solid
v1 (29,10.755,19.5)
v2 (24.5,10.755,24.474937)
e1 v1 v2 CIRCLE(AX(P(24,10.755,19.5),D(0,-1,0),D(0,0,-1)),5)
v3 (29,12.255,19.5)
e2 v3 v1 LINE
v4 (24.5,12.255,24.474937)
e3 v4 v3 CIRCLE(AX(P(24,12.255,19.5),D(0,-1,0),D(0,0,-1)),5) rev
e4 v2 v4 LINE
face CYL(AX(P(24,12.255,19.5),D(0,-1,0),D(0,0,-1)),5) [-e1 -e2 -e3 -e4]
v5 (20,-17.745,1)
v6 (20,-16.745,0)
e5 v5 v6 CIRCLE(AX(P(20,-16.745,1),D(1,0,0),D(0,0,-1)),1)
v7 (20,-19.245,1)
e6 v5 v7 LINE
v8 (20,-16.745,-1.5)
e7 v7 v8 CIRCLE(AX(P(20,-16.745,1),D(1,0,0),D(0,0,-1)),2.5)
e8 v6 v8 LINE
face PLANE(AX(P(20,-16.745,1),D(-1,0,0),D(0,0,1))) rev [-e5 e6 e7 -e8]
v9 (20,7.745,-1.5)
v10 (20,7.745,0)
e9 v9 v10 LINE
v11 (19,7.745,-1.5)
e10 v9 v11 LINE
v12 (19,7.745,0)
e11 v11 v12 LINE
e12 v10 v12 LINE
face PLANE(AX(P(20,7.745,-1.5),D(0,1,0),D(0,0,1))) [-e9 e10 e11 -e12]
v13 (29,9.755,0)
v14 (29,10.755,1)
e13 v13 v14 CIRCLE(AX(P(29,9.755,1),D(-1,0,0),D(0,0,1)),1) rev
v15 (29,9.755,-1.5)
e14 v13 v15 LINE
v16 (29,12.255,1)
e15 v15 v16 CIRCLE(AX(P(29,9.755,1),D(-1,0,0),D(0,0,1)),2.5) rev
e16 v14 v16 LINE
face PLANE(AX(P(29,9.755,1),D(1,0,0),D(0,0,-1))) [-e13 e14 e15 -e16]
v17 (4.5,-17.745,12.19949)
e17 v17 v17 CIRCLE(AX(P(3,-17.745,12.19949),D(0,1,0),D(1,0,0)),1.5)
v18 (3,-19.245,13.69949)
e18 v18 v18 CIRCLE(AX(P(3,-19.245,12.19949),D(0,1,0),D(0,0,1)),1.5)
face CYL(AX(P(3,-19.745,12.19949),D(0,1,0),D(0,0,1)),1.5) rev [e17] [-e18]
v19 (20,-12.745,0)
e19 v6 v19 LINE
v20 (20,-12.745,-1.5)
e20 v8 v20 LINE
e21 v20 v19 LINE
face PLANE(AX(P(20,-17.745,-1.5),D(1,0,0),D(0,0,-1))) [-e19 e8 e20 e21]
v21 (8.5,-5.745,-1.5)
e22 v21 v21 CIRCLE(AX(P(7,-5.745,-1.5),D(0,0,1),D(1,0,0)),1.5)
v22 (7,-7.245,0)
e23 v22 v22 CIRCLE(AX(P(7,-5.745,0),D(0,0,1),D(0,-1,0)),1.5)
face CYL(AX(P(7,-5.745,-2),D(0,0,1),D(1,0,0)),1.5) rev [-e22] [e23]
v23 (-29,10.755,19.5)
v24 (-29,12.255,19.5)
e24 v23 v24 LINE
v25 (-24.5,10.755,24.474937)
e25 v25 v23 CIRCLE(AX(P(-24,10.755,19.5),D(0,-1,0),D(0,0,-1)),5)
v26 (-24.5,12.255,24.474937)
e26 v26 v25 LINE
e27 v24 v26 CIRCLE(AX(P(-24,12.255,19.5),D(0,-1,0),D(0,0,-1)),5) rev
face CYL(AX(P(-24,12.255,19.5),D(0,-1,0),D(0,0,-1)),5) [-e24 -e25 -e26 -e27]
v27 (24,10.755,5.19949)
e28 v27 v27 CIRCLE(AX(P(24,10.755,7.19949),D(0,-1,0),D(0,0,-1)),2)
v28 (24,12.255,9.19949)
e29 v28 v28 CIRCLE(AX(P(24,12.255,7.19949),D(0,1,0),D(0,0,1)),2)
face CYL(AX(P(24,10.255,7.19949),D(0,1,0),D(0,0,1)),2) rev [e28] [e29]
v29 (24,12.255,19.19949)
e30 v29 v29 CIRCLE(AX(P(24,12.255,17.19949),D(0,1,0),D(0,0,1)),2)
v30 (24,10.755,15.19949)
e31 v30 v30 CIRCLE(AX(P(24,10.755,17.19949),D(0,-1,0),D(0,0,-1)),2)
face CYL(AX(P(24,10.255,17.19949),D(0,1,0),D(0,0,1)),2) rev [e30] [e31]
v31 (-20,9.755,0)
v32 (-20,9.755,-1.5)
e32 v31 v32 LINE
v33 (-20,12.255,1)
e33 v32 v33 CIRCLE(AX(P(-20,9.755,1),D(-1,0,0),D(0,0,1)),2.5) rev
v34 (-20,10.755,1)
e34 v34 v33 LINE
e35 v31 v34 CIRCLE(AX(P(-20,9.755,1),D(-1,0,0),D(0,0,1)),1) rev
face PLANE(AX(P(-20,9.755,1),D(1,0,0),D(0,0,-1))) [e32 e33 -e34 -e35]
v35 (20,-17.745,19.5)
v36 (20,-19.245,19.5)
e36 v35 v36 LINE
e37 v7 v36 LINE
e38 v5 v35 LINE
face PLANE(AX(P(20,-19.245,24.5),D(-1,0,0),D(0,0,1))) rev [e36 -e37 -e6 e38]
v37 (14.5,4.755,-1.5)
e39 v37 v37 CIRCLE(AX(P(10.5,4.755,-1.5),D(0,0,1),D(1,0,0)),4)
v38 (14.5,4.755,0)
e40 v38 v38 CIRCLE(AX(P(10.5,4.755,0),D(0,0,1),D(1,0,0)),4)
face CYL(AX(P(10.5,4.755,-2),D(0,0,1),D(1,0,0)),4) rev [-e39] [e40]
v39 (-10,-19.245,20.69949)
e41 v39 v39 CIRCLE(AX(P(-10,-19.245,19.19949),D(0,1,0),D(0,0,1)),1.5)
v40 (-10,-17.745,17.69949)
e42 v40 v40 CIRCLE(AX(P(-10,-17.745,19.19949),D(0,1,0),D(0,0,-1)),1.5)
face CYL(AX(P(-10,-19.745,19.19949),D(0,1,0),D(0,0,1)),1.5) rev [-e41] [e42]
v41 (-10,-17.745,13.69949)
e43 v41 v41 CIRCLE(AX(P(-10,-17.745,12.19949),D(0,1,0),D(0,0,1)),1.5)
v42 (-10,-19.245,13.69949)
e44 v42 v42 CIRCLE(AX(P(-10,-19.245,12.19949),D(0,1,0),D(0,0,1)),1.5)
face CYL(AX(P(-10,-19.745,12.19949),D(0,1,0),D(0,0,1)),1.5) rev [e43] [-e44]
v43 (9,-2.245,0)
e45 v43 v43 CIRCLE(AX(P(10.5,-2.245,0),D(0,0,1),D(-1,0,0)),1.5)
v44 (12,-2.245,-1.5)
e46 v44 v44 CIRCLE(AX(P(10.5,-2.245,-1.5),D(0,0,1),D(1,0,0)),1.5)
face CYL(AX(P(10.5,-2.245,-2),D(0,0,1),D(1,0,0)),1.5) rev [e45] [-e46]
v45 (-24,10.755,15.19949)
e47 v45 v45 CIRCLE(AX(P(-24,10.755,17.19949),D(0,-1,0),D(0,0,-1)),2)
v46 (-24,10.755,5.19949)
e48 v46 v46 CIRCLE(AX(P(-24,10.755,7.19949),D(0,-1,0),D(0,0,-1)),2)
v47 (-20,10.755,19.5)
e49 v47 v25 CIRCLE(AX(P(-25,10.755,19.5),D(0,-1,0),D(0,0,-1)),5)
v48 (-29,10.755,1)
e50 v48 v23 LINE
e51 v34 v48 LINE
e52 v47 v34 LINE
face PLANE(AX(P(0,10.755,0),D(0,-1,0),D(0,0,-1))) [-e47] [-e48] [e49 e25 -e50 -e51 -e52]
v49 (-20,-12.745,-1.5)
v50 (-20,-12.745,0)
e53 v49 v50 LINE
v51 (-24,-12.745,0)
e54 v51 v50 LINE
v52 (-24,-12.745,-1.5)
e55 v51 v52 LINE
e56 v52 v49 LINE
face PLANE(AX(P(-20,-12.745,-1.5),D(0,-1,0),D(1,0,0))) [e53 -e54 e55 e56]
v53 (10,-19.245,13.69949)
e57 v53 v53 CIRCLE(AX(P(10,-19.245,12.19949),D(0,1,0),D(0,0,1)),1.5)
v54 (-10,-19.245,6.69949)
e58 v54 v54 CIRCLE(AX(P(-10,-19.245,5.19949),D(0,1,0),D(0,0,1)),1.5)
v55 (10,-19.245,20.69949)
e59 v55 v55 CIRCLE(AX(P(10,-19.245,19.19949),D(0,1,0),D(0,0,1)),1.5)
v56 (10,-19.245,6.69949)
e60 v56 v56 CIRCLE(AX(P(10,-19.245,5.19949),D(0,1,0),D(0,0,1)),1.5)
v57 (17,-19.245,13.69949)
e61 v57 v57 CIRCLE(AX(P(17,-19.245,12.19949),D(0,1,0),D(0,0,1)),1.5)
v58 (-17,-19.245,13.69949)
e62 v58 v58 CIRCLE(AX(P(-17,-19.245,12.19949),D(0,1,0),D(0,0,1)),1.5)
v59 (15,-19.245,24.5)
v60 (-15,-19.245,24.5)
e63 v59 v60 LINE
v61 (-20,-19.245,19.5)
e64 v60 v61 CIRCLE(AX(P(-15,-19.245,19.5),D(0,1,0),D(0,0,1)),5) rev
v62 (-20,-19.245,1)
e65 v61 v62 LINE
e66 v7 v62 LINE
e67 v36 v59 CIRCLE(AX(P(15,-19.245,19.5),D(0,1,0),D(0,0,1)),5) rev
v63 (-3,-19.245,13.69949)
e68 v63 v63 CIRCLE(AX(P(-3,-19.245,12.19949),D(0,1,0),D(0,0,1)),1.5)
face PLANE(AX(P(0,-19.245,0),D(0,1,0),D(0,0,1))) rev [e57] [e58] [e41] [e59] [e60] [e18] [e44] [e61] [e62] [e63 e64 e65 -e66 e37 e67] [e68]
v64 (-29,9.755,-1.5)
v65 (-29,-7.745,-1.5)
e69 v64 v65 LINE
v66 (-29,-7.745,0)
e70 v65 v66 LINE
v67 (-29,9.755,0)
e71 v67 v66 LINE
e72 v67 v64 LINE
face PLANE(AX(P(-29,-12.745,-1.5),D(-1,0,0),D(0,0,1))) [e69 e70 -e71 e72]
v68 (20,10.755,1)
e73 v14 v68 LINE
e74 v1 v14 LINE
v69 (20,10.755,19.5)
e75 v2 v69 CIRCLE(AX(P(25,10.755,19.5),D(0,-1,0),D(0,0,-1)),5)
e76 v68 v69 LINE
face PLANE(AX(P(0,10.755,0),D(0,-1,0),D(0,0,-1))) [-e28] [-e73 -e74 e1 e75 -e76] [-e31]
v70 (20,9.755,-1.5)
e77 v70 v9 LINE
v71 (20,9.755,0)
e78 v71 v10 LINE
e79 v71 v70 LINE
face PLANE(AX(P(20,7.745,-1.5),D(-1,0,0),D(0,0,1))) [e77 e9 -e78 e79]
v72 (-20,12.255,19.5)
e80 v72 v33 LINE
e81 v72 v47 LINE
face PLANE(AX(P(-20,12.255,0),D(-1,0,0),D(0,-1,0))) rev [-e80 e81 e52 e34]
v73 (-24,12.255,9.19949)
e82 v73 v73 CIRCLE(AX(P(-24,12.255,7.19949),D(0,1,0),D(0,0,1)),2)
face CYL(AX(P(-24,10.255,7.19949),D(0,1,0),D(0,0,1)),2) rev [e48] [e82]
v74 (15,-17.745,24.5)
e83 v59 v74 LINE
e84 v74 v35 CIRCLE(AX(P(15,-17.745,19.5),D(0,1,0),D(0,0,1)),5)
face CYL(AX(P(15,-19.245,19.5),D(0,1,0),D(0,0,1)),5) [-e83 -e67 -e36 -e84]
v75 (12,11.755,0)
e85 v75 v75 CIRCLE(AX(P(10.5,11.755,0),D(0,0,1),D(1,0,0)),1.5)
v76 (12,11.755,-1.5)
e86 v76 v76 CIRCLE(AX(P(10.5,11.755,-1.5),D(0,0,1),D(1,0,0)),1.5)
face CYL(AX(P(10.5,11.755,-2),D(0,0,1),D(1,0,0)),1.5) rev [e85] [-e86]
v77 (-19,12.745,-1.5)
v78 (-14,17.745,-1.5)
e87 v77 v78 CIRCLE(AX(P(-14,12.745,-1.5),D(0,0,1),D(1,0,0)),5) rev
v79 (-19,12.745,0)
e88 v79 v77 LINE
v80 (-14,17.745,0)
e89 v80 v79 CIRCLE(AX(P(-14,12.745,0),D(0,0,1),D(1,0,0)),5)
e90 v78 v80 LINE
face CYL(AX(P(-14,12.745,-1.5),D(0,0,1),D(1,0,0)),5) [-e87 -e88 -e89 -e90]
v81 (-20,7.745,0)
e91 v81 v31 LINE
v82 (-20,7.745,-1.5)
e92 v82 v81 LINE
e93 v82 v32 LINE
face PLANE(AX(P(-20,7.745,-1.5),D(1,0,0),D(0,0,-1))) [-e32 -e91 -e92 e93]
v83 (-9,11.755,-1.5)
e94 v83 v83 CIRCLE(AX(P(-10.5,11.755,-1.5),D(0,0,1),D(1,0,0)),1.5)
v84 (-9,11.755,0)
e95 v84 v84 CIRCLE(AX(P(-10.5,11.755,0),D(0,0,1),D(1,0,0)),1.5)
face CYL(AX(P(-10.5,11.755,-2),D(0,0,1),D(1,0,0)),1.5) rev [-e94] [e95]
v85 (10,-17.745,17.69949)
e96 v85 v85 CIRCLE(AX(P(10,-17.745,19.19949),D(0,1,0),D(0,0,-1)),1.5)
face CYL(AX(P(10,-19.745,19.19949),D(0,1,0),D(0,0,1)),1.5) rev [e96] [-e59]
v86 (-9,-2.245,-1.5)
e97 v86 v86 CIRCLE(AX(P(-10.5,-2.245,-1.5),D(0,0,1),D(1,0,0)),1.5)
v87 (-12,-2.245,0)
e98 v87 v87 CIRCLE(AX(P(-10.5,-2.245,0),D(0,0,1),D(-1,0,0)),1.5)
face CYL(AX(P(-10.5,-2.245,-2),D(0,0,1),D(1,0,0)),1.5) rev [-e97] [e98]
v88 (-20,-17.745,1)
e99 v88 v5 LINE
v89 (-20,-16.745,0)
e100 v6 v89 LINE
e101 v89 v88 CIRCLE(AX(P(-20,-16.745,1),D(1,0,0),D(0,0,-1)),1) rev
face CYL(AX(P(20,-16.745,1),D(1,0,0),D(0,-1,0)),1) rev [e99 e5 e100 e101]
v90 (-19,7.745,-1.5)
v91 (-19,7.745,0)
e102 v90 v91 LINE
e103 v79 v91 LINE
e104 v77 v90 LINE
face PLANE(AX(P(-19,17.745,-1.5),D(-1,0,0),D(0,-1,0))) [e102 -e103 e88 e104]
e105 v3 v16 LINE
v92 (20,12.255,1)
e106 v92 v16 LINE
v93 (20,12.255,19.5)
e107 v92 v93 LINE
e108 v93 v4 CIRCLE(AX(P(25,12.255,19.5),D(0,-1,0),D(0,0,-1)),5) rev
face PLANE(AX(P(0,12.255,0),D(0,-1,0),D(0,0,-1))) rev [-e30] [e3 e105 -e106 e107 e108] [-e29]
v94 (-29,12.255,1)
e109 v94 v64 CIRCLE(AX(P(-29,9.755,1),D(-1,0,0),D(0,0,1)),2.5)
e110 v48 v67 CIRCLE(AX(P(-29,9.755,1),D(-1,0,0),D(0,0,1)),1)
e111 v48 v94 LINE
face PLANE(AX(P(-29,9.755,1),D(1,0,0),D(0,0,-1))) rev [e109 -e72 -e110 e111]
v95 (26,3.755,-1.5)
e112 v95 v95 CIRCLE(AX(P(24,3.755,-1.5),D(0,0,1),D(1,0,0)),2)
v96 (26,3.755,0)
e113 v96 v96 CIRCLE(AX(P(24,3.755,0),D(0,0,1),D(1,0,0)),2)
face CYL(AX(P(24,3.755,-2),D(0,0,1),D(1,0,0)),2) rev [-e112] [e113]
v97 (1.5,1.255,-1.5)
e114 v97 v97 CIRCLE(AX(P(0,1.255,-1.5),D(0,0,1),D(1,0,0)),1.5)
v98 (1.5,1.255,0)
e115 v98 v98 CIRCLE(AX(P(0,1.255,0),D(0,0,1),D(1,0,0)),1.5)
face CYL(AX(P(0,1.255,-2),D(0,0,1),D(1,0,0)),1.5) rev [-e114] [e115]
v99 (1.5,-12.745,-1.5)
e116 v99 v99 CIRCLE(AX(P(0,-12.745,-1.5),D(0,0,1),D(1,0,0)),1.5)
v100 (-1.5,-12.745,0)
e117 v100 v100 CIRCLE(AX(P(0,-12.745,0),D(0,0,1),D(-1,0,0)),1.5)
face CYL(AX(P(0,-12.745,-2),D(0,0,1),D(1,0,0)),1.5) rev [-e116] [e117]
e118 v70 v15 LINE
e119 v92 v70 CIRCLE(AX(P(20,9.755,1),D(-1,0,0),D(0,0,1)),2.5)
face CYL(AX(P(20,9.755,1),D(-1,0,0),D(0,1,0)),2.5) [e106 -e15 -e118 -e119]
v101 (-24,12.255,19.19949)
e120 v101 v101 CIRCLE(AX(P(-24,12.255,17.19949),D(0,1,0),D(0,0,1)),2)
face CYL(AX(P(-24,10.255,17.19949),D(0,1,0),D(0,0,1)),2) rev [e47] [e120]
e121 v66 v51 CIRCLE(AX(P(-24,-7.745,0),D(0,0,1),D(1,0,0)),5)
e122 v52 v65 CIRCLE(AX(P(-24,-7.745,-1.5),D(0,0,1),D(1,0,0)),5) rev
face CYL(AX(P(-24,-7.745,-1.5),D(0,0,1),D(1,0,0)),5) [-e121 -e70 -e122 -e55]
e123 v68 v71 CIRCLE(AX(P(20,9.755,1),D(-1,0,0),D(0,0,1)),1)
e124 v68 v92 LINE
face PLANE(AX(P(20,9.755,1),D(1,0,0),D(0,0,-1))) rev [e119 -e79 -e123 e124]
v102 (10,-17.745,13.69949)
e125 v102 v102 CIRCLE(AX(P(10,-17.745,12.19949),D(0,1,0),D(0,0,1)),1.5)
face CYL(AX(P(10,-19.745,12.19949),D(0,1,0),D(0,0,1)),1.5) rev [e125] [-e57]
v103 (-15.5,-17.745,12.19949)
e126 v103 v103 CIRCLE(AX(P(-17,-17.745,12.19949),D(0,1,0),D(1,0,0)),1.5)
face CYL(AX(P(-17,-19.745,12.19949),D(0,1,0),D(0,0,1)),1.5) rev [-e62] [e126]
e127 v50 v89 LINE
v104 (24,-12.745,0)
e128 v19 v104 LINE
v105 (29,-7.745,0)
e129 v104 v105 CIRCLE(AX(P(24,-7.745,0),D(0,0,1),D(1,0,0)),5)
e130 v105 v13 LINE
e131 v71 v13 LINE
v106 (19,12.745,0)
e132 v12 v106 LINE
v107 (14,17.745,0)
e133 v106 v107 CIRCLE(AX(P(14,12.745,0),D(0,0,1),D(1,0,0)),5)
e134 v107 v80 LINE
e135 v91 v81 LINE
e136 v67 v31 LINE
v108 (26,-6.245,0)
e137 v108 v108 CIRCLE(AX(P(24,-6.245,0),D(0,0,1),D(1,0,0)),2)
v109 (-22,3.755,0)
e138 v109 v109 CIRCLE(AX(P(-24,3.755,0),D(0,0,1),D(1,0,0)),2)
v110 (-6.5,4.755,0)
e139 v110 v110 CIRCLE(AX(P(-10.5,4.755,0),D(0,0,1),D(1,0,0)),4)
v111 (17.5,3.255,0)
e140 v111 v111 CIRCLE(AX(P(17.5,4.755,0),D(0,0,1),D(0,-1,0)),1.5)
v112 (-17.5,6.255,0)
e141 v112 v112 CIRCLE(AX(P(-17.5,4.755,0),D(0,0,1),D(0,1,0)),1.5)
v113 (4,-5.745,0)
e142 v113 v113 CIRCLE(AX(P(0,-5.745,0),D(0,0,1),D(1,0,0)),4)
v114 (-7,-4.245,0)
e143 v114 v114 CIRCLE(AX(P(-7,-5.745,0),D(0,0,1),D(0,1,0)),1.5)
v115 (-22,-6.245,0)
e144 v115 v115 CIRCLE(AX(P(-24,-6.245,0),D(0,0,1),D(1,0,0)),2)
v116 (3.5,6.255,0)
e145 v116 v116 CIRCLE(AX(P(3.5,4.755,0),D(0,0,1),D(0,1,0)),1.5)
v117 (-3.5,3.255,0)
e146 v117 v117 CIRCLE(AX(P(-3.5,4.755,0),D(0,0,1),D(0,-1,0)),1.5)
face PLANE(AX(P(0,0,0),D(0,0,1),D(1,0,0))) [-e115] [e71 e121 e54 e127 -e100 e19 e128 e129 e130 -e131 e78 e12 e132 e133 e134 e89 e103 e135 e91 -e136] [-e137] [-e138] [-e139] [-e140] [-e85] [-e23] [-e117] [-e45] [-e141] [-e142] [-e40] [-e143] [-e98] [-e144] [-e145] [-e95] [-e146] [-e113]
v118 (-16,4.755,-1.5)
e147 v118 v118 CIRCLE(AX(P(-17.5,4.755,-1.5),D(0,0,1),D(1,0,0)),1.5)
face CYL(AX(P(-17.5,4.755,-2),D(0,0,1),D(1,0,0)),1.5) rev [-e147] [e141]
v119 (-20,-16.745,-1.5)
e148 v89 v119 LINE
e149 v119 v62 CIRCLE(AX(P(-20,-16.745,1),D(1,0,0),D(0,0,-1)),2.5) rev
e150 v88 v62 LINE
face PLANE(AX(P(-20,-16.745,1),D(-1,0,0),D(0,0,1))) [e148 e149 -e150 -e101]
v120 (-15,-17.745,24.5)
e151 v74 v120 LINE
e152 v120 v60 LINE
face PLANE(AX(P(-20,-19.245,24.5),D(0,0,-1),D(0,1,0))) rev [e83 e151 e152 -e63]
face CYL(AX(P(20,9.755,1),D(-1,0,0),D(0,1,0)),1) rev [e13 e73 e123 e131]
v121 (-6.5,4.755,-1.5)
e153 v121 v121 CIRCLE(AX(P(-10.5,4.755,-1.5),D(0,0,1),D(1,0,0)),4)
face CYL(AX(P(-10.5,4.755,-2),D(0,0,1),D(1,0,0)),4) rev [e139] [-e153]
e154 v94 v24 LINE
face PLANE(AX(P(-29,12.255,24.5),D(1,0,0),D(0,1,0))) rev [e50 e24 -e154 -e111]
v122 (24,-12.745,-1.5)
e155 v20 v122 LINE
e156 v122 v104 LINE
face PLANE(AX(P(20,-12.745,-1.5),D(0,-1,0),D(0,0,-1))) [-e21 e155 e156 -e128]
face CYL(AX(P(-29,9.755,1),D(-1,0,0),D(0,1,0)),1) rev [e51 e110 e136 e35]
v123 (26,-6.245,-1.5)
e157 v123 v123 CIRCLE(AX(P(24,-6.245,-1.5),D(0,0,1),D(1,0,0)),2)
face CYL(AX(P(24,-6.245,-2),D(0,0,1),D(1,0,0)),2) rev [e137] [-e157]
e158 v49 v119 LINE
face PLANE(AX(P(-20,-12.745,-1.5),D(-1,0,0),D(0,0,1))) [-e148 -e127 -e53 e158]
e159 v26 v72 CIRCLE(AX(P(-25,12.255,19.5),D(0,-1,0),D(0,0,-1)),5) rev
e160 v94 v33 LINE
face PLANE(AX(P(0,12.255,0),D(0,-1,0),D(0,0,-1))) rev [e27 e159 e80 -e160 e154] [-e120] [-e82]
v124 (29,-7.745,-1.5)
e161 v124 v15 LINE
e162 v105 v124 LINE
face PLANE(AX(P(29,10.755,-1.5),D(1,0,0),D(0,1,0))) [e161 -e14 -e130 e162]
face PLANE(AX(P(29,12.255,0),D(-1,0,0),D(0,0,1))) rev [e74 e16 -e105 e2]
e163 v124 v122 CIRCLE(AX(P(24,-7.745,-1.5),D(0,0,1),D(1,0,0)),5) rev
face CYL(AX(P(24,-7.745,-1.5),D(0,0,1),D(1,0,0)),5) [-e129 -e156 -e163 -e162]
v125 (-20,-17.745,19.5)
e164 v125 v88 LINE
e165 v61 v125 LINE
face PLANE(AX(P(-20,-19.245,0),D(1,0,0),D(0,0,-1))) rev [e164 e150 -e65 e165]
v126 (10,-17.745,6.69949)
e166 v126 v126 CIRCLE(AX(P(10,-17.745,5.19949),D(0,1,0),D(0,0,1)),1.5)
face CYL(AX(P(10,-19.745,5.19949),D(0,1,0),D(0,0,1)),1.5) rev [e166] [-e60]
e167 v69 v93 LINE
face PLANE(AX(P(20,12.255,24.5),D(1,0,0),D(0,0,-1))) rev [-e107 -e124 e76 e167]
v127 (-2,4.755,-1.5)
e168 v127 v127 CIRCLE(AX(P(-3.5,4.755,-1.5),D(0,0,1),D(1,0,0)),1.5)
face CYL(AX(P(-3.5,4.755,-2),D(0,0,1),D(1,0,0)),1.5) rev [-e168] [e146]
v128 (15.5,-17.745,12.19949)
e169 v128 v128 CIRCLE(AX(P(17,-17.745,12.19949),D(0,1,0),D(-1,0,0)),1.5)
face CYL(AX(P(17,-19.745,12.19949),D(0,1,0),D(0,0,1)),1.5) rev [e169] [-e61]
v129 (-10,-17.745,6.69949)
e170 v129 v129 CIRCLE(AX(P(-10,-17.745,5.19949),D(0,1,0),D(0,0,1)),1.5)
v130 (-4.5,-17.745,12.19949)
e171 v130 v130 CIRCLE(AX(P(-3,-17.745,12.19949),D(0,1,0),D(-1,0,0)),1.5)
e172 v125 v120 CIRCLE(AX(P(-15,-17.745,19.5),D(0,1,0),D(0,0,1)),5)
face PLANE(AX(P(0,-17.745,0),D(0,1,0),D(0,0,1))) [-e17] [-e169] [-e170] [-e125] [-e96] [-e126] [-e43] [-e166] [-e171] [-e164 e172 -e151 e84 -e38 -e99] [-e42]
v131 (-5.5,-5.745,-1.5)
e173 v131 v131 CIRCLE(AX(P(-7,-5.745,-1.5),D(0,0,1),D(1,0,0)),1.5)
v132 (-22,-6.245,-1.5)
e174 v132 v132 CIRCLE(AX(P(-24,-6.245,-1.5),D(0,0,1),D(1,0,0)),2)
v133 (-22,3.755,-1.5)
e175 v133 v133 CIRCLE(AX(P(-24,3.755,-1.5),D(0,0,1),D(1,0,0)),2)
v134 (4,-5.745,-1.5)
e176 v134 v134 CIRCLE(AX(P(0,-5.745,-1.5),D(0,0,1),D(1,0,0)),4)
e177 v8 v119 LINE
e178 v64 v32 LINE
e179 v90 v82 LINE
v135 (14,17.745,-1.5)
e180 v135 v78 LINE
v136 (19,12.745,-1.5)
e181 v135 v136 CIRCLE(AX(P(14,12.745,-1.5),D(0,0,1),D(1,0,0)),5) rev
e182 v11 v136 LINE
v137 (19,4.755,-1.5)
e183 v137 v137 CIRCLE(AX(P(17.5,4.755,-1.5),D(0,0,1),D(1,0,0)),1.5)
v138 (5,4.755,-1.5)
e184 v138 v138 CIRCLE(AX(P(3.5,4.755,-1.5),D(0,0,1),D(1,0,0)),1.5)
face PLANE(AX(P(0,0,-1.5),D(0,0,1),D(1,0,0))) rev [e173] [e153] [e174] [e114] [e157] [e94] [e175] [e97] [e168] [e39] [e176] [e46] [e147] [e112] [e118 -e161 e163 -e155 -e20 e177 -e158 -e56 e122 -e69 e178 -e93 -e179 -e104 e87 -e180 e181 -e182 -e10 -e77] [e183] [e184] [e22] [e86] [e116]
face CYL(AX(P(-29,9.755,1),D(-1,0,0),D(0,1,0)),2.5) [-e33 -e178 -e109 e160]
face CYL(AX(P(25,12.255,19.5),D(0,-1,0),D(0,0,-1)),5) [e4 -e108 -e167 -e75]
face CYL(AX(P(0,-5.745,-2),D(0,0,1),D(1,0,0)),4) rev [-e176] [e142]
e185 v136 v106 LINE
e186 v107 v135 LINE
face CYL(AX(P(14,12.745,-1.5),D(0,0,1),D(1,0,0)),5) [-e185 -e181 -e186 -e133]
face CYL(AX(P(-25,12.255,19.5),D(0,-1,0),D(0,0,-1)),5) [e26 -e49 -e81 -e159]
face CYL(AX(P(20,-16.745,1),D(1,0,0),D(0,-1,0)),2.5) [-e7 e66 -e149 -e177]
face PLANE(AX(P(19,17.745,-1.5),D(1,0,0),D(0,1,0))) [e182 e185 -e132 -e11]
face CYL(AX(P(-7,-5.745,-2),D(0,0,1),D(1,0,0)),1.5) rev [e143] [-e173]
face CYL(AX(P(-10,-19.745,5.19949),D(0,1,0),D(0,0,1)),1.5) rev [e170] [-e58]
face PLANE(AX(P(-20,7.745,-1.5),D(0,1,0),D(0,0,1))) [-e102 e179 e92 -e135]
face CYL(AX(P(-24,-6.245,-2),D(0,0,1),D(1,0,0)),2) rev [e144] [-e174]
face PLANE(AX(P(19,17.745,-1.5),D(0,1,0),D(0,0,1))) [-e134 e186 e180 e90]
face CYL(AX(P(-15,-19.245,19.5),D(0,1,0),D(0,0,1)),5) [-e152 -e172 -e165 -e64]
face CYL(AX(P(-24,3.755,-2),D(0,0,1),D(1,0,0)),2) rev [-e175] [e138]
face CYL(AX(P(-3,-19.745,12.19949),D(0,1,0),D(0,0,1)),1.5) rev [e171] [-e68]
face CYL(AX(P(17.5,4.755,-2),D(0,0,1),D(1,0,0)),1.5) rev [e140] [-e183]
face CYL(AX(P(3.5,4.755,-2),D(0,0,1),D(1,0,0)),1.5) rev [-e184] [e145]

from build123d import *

# Parameters (mm, degrees)
BRIDA_BASE2_DEPTH                = 1.5
BRIDA_DE_ARISTA3_STRIP_W         = 8
BRIDA_DE_ARISTA3_STRIP_H         = 1.5
BRIDA_DE_ARISTA3_STRIP_CUT_DEPTH = 40
BRIDA_DE_ARISTA3_DEPTH           = 40
BRIDA_DE_ARISTA4_STRIP_W         = 8
BRIDA_DE_ARISTA4_STRIP_H         = 1.5
BRIDA_DE_ARISTA4_STRIP_CUT_DEPTH = 9
BRIDA_DE_ARISTA4_DEPTH           = 9
BRIDA_DE_ARISTA5_STRIP_W         = 8
BRIDA_DE_ARISTA5_STRIP_H         = 1.5
BRIDA_DE_ARISTA5_STRIP_CUT_DEPTH = 9
BRIDA_DE_ARISTA5_DEPTH           = 9
REDONDEO1_R                      = 5
REDONDEO2_R                      = 5
REDONDEO3_R                      = 5
REDONDEO4_R                      = 5
REDONDEO5_R                      = 5
REDONDEO6_R                      = 5
REDONDEO7_R                      = 5
REDONDEO8_R                      = 5
CROQUIS39_R                      = 4
CORTAR_EXTRUIR2_DEPTH            = 2
CROQUIS40_R                      = 1.5
CORTAR_EXTRUIR3_DEPTH            = 2
MATRIZC1_COUNT                   = 4
CROQUIS41_R                      = 1.5
CORTAR_EXTRUIR4_DEPTH            = 2
MATRIZC2_COUNT                   = 4
CROQUIS42_R                      = 1.5
CORTAR_EXTRUIR5_DEPTH            = 2
MATRIZC3_COUNT                   = 4
CROQUIS46_R                      = 2
CORTAR_EXTRUIR9_DEPTH            = 2
CROQUIS49_R                      = 2
CORTAR_EXTRUIR10_DEPTH           = 2
CROQUIS51_R                      = 1.500000001
CORTAR_EXTRUIR11_DEPTH           = 2
CROQUIS52_R                      = 1.500000001
CORTAR_EXTRUIR12_DEPTH           = 2
CROQUIS53_R                      = 1.500000001
CORTAR_EXTRUIR13_DEPTH           = 2
MATRIZC4_COUNT                   = 4
MATRIZC5_COUNT                   = 4


# Sheet-metal steps are written as plain solids
with BuildPart() as part:
    # Croquis1 → Brida base2 (new body)
    with BuildSketch(Plane.XY):
        Polygon((20, -17.745), (20, -12.745), (29, -12.745), (29, 10.755), (20, 10.755), (20, 7.745), (19, 7.745), (19, 17.745), (-19, 17.745), (-19, 7.745), (-20, 7.745), (-20, 10.755), (-29, 10.755), (-29, -12.745), (-20, -12.745), (-20, -17.745), align=None)
    extrude(amount=-BRIDA_BASE2_DEPTH)

    # Brida de arista3 strip (across the edge) → Brida de arista3 strip cut (cut)
    with BuildSketch(Plane(origin=(-20, -17.745, 0), x_dir=(0, 1, 0), z_dir=(1, 0, 0))):
        with Locations((-3, -0.75)):
            Rectangle(BRIDA_DE_ARISTA3_STRIP_W, BRIDA_DE_ARISTA3_STRIP_H)
    extrude(amount=BRIDA_DE_ARISTA3_STRIP_CUT_DEPTH, mode=Mode.SUBTRACT)

    # Brida de arista3 section (across the edge) → Brida de arista3 (add)
    with BuildSketch(Plane(origin=(-20, -17.745, 0), x_dir=(0, 1, 0), z_dir=(1, 0, 0))):
        with BuildLine():
            Line((-1.5, 1), (-1.5, 24.5))
            Line((-1.5, 24.5), (0, 24.5))
            Line((0, 24.5), (0, 1))
            ThreePointArc((0, 1), (0.292893219, 0.292893219), (1, 0))
            Line((1, 0), (1, -1.5))
            ThreePointArc((1, -1.5), (-0.767766953, -0.767766953), (-1.5, 1))
        make_face()
    extrude(amount=BRIDA_DE_ARISTA3_DEPTH)

    # Brida de arista4 strip (across the edge) → Brida de arista4 strip cut (cut)
    with BuildSketch(Plane(origin=(29, 10.755, 0), x_dir=(0, -1, 0), z_dir=(-1, 0, 0))):
        with Locations((-3, -0.75)):
            Rectangle(BRIDA_DE_ARISTA4_STRIP_W, BRIDA_DE_ARISTA4_STRIP_H)
    extrude(amount=BRIDA_DE_ARISTA4_STRIP_CUT_DEPTH, mode=Mode.SUBTRACT)

    # Brida de arista4 section (across the edge) → Brida de arista4 (add)
    with BuildSketch(Plane(origin=(29, 10.755, 0), x_dir=(0, -1, 0), z_dir=(-1, 0, 0))):
        with BuildLine():
            Line((-1.5, 1), (-1.5, 24.5))
            Line((-1.5, 24.5), (0, 24.5))
            Line((0, 24.5), (0, 1))
            ThreePointArc((0, 1), (0.292893219, 0.292893219), (1, 0))
            Line((1, 0), (1, -1.5))
            ThreePointArc((1, -1.5), (-0.767766953, -0.767766953), (-1.5, 1))
        make_face()
    extrude(amount=BRIDA_DE_ARISTA4_DEPTH)

    # Brida de arista5 strip (across the edge) → Brida de arista5 strip cut (cut)
    with BuildSketch(Plane(origin=(-20, 10.755, 0), x_dir=(0, -1, 0), z_dir=(-1, 0, 0))):
        with Locations((-3, -0.75)):
            Rectangle(BRIDA_DE_ARISTA5_STRIP_W, BRIDA_DE_ARISTA5_STRIP_H)
    extrude(amount=BRIDA_DE_ARISTA5_STRIP_CUT_DEPTH, mode=Mode.SUBTRACT)

    # Brida de arista5 section (across the edge) → Brida de arista5 (add)
    with BuildSketch(Plane(origin=(-20, 10.755, 0), x_dir=(0, -1, 0), z_dir=(-1, 0, 0))):
        with BuildLine():
            Line((-1.5, 1), (-1.5, 24.5))
            Line((-1.5, 24.5), (0, 24.5))
            Line((0, 24.5), (0, 1))
            ThreePointArc((0, 1), (0.292893219, 0.292893219), (1, 0))
            Line((1, 0), (1, -1.5))
            ThreePointArc((1, -1.5), (-0.767766953, -0.767766953), (-1.5, 1))
        make_face()
    extrude(amount=BRIDA_DE_ARISTA5_DEPTH)

    # Redondeo1
    redondeo1_edges = [part.edges().sort_by_distance(p)[0] for p in [
        (19, 17.745, -0.75),
    ]]
    fillet(redondeo1_edges, radius=REDONDEO1_R)

    # Redondeo2
    redondeo2_edges = [part.edges().sort_by_distance(p)[0] for p in [
        (-19, 17.745, -0.75),
    ]]
    fillet(redondeo2_edges, radius=REDONDEO2_R)

    # Redondeo3
    redondeo3_edges = [part.edges().sort_by_distance(p)[0] for p in [
        (-29, -12.745, -0.75),
    ]]
    fillet(redondeo3_edges, radius=REDONDEO3_R)

    # Redondeo4
    redondeo4_edges = [part.edges().sort_by_distance(p)[0] for p in [
        (29, -12.745, -0.75),
    ]]
    fillet(redondeo4_edges, radius=REDONDEO4_R)

    # Redondeo5
    redondeo5_edges = [part.edges().sort_by_distance(p)[0] for p in [
        (20, -18.495, 24.5),
    ]]
    fillet(redondeo5_edges, radius=REDONDEO5_R)

    # Redondeo6
    redondeo6_edges = [part.edges().sort_by_distance(p)[0] for p in [
        (-20, -18.495, 24.5),
    ]]
    fillet(redondeo6_edges, radius=REDONDEO6_R)

    # Redondeo7
    # the kernel refuses this fillet: 5 mm, written as the material it takes off along each edge
    with BuildSketch(Plane(origin=(20, 24.755, 24.5), x_dir=(0, 0, -1), z_dir=(0, -1, 0))) as redondeo7_piece_1:
        with BuildLine():
            CenterArc((REDONDEO7_R, REDONDEO7_R), REDONDEO7_R, 180, 90)
            Line((0, REDONDEO7_R), (0, 0))
            Line((0, 0), (REDONDEO7_R, 0))
        make_face()
    extrude(amount=26.5, mode=Mode.SUBTRACT)
    with BuildSketch(Plane(origin=(29, 24.755, 24.5), x_dir=(0, 0, -1), z_dir=(0, -1, 0))) as redondeo7_piece_2:
        with BuildLine():
            CenterArc((REDONDEO7_R, -REDONDEO7_R), REDONDEO7_R, 90, 90)
            Line((0, -REDONDEO7_R), (0, 0))
            Line((0, 0), (REDONDEO7_R, 0))
        make_face()
    extrude(amount=26.5, mode=Mode.SUBTRACT)

    # Redondeo8
    # the kernel refuses this fillet: 5 mm, written as the material it takes off along each edge
    with BuildSketch(Plane(origin=(-29, 24.755, 24.5), x_dir=(0, 0, -1), z_dir=(0, -1, 0))) as redondeo8_piece_1:
        with BuildLine():
            CenterArc((REDONDEO8_R, REDONDEO8_R), REDONDEO8_R, 180, 90)
            Line((0, REDONDEO8_R), (0, 0))
            Line((0, 0), (REDONDEO8_R, 0))
        make_face()
    extrude(amount=26.5, mode=Mode.SUBTRACT)
    with BuildSketch(Plane(origin=(-20, 24.755, 24.5), x_dir=(0, 0, -1), z_dir=(0, -1, 0))) as redondeo8_piece_2:
        with BuildLine():
            CenterArc((REDONDEO8_R, -REDONDEO8_R), REDONDEO8_R, 90, 90)
            Line((0, -REDONDEO8_R), (0, 0))
            Line((0, 0), (REDONDEO8_R, 0))
        make_face()
    extrude(amount=26.5, mode=Mode.SUBTRACT)

    # Croquis39 → Cortar-Extruir2 (cut)
    with BuildSketch(Plane.XY):
        with Locations((-10.5, 4.755)):
            Circle(CROQUIS39_R)
        with Locations((10.5, 4.755)):
            Circle(CROQUIS39_R)
        with Locations((0, -5.745)):
            Circle(CROQUIS39_R)
    extrude(amount=-CORTAR_EXTRUIR2_DEPTH, mode=Mode.SUBTRACT)

    # Croquis40 → Cortar-Extruir3 (cut)
    with BuildSketch(Plane.XY):
        with Locations((-10.5, 11.755)):
            Circle(CROQUIS40_R)
    cortar_extruir3 = extrude(amount=-CORTAR_EXTRUIR3_DEPTH, mode=Mode.SUBTRACT)

    # MatrizC1: Cortar-Extruir3 ×4 about axis
    matrizc1_axis = Axis((-10.5, 4.755, 0), (0, 0, 1))
    for i in range(1, MATRIZC1_COUNT):
        add(cortar_extruir3.rotate(matrizc1_axis, i * 360 / MATRIZC1_COUNT), mode=Mode.SUBTRACT)

    # Croquis41 → Cortar-Extruir4 (cut)
    with BuildSketch(Plane.XY):
        with Locations((0, 1.255)):
            Circle(CROQUIS41_R)
    cortar_extruir4 = extrude(amount=-CORTAR_EXTRUIR4_DEPTH, mode=Mode.SUBTRACT)

    # MatrizC2: Cortar-Extruir4 ×4 about axis
    matrizc2_axis = Axis((0, -5.745, 0), (0, 0, 1))
    for i in range(1, MATRIZC2_COUNT):
        add(cortar_extruir4.rotate(matrizc2_axis, i * 360 / MATRIZC2_COUNT), mode=Mode.SUBTRACT)

    # Croquis42 → Cortar-Extruir5 (cut)
    with BuildSketch(Plane.XY):
        with Locations((10.5, 11.755)):
            Circle(CROQUIS42_R)
    cortar_extruir5 = extrude(amount=-CORTAR_EXTRUIR5_DEPTH, mode=Mode.SUBTRACT)

    # MatrizC3: Cortar-Extruir5 ×4 about axis
    matrizc3_axis = Axis((10.5, 4.755, 0), (0, 0, 1))
    for i in range(1, MATRIZC3_COUNT):
        add(cortar_extruir5.rotate(matrizc3_axis, i * 360 / MATRIZC3_COUNT), mode=Mode.SUBTRACT)

    # Croquis46 → Cortar-Extruir9 (cut)
    with BuildSketch(Plane.XY):
        with Locations((24, 3.755)):
            Circle(CROQUIS46_R)
        with Locations((24, -6.245)):
            Circle(CROQUIS46_R)
        with Locations((-24, 3.755)):
            Circle(CROQUIS46_R)
        with Locations((-24, -6.245)):
            Circle(CROQUIS46_R)
    extrude(amount=-CORTAR_EXTRUIR9_DEPTH, mode=Mode.SUBTRACT)

    # Croquis49 → Cortar-Extruir10 (cut)
    with BuildSketch(Plane(origin=(0, 12.255, 0), x_dir=(1, 0, 0), z_dir=(0, 1, 0))):
        with Locations(Location((-24, -7.199489743, 0), (0, 0, 270))):
            Circle(CROQUIS49_R)
        with Locations(Location((24, -7.199489743, 0), (0, 0, 270))):
            Circle(CROQUIS49_R)
        with Locations(Location((24, -17.199489743, 0), (0, 0, 270))):
            Circle(CROQUIS49_R)
        with Locations(Location((-24, -17.199489743, 0), (0, 0, 270))):
            Circle(CROQUIS49_R)
    extrude(amount=-CORTAR_EXTRUIR10_DEPTH, mode=Mode.SUBTRACT)

    # Croquis51 → Cortar-Extruir11 (cut)
    with BuildSketch(Plane(origin=(0, -17.745, 0), x_dir=(1, 0, 0), z_dir=(0, 1, 0))):
        with Locations(Location((-10, -12.199489743, 0), (0, 0, 270))):
            Circle(CROQUIS51_R)
        with Locations(Location((10, -12.199489743, 0), (0, 0, 270))):
            Circle(CROQUIS51_R)
    extrude(amount=-CORTAR_EXTRUIR11_DEPTH, mode=Mode.SUBTRACT)

    # Croquis52 → Cortar-Extruir12 (cut)
    with BuildSketch(Plane(origin=(0, -17.745, 0), x_dir=(1, 0, 0), z_dir=(0, 1, 0))):
        with Locations(Location((-10, -5.199489743, 0), (0, 0, 270))):
            Circle(CROQUIS52_R)
    cortar_extruir12 = extrude(amount=-CORTAR_EXTRUIR12_DEPTH, mode=Mode.SUBTRACT)

    # Croquis53 → Cortar-Extruir13 (cut)
    with BuildSketch(Plane(origin=(0, -17.745, 0), x_dir=(1, 0, 0), z_dir=(0, 1, 0))):
        with Locations(Location((10, -5.199489743, 0), (0, 0, 270))):
            Circle(CROQUIS53_R)
    cortar_extruir13 = extrude(amount=-CORTAR_EXTRUIR13_DEPTH, mode=Mode.SUBTRACT)

    # MatrizC4: Cortar-Extruir12 ×4 about axis
    matrizc4_axis = Axis((-10, 0, 12.199489743), (0, 1, 0))
    for i in range(1, MATRIZC4_COUNT):
        add(cortar_extruir12.rotate(matrizc4_axis, i * 360 / MATRIZC4_COUNT), mode=Mode.SUBTRACT)

    # MatrizC5: Cortar-Extruir13 ×4 about axis
    matrizc5_axis = Axis((10, 0, 12.199489743), (0, 1, 0))
    for i in range(1, MATRIZC5_COUNT):
        add(cortar_extruir13.rotate(matrizc5_axis, i * 360 / MATRIZC5_COUNT), mode=Mode.SUBTRACT)


solid = part.part
